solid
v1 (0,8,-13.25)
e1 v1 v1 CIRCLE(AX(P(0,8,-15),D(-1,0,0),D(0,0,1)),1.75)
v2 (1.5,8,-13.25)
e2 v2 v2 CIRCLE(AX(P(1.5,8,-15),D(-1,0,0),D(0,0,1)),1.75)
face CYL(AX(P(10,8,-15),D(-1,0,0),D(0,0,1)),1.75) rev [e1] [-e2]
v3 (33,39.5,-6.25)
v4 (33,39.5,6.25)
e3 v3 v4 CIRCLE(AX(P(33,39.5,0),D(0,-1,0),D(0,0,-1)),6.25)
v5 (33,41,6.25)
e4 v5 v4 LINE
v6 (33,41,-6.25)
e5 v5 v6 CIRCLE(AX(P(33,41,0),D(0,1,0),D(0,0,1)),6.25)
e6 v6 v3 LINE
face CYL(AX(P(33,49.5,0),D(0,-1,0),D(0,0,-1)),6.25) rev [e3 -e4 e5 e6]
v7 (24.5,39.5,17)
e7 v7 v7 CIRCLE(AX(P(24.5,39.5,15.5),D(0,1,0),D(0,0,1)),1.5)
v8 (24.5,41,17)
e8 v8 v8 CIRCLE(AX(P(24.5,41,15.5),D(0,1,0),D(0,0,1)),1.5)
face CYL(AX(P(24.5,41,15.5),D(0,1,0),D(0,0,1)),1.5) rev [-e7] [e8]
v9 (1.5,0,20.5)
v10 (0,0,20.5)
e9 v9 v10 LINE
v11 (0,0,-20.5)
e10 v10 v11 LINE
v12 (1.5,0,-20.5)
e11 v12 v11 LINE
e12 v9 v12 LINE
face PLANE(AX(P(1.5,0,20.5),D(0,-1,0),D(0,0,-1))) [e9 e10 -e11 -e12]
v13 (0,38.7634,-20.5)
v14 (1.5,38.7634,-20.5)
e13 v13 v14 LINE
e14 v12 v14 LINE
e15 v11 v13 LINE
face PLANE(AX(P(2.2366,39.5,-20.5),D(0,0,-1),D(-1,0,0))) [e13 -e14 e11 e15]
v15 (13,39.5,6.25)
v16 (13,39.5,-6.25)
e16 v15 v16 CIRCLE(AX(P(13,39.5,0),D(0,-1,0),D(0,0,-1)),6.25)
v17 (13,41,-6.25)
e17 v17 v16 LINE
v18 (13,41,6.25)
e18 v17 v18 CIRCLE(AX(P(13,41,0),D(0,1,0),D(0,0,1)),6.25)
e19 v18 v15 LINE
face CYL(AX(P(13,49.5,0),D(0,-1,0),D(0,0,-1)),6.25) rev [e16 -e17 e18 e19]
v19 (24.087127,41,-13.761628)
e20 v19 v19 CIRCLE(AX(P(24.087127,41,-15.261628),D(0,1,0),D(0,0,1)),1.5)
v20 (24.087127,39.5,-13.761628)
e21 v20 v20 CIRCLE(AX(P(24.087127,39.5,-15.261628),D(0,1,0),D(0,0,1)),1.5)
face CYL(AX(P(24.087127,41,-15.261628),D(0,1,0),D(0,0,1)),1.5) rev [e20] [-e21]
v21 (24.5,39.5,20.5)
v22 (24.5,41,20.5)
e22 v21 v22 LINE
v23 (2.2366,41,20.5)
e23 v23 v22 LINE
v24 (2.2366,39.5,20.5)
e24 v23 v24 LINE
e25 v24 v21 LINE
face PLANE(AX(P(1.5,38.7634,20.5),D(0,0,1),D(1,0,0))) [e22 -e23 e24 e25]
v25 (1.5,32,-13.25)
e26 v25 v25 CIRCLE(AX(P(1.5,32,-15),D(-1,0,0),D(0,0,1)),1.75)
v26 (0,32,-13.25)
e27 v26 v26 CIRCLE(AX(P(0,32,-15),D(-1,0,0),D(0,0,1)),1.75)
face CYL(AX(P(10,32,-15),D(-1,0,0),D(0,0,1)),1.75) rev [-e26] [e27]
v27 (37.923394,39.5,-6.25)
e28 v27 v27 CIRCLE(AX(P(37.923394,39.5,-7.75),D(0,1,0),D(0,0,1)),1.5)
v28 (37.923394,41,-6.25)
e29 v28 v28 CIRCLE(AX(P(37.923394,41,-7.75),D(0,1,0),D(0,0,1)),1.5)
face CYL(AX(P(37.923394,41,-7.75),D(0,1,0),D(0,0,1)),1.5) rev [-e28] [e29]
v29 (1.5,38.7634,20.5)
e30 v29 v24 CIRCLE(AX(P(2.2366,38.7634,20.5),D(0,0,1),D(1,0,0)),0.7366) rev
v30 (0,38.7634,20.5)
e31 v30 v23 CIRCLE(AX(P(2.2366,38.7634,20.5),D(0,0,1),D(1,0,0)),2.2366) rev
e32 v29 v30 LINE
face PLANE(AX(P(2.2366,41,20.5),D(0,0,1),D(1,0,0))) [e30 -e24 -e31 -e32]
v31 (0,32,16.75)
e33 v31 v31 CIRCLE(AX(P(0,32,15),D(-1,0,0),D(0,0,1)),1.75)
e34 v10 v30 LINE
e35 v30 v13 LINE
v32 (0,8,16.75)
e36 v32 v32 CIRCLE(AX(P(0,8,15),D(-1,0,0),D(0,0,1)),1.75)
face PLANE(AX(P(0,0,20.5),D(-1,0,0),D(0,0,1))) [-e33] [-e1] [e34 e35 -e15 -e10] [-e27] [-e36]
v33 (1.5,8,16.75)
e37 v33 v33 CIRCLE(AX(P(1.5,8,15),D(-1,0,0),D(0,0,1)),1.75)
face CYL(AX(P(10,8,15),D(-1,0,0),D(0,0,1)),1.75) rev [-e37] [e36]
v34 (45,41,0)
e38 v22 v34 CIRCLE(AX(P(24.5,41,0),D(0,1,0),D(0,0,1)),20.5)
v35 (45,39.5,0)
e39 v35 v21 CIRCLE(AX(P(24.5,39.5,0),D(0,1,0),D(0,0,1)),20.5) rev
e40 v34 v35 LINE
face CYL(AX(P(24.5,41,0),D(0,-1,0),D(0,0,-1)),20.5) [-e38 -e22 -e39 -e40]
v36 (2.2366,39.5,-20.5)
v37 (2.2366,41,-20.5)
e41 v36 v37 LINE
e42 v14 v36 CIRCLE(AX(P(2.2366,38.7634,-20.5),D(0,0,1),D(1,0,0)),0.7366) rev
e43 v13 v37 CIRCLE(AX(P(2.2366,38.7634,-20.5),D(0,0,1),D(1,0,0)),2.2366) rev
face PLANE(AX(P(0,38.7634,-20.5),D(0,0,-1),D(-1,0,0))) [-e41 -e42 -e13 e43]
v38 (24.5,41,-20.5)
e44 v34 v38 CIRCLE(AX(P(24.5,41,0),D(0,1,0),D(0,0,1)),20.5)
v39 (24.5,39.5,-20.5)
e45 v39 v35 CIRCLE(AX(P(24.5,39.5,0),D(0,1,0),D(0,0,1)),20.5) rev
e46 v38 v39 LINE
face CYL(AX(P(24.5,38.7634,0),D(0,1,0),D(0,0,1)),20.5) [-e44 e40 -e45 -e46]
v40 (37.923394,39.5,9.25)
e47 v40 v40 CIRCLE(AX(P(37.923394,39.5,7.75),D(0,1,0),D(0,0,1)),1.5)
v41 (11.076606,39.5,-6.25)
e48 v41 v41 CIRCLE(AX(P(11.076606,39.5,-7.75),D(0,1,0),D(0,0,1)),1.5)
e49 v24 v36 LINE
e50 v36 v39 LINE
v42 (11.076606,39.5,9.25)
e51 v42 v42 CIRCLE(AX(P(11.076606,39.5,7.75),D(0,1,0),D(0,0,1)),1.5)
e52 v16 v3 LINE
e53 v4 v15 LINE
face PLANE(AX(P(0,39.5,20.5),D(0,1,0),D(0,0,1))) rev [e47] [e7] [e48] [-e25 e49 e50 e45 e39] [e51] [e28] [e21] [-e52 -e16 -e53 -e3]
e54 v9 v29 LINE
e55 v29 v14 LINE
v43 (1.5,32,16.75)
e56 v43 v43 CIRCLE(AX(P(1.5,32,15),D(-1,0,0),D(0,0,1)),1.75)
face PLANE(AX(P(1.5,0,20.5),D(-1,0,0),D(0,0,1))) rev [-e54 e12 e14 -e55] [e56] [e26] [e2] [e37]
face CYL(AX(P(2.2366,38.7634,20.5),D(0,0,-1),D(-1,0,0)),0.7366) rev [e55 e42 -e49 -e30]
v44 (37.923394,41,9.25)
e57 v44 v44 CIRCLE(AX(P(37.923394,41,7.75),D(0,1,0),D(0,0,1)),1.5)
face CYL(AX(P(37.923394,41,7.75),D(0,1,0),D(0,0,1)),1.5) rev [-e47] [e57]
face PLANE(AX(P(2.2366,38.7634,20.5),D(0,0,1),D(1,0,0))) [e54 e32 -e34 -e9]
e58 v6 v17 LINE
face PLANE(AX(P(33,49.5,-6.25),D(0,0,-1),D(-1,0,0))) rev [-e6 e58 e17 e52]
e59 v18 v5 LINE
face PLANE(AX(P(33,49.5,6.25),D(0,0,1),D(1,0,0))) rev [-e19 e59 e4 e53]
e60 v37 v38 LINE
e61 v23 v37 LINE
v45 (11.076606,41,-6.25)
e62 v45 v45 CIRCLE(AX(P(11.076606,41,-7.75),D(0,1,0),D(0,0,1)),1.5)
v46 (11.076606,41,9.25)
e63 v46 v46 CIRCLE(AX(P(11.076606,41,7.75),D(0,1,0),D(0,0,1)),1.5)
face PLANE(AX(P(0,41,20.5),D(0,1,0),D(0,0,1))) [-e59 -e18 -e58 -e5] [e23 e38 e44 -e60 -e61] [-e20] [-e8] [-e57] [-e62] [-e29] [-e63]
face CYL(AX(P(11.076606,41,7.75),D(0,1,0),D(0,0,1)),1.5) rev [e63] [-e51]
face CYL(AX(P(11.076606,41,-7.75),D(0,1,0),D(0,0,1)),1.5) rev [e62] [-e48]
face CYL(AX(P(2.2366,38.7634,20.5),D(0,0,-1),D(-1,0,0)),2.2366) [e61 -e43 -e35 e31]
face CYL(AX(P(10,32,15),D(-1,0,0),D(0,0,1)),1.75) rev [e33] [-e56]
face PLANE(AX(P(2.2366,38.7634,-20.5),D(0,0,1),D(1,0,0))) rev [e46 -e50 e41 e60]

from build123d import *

# Parameters (mm, degrees)
SM_BASE_FLANGE_1_DEPTH = 20.5
FILLET_1_R             = 20.5
MM_1_D                 = 3
MM_1_DEPTH             = 7.5
MM_1_TIP               = 0.901290929
SKETCH_10_R            = 1.75
CUT_EXTRUDE_1_DEPTH    = 10
CUT_EXTRUDE_2_DEPTH    = 10


# Sheet-metal steps are written as plain solids
with BuildPart() as part:
    # Sketch 1 → 基体-法兰1 (new, symmetric)
    with BuildSketch(Plane.XY):
        with BuildLine():
            Line((0, 0), (0, 38.7634))
            ThreePointArc((0, 38.7634), (0.655084973, 40.344915027), (2.2366, 41))
            Line((2.2366, 41), (45, 41))
            Line((45, 41), (45, 39.5))
            Line((45, 39.5), (2.2366, 39.5))
            ThreePointArc((2.2366, 39.5), (1.715745145, 39.284254855), (1.5, 38.7634))
            Line((1.5, 38.7634), (1.5, 0))
            Line((1.5, 0), (0, 0))
        make_face()
    extrude(amount=SM_BASE_FLANGE_1_DEPTH, both=True)

    # 圆角1
    fillet_1_edges = [part.edges().sort_by_distance(p)[0] for p in [
        (45, 40.25, -20.5),
        (45, 40.25, 20.5),
    ]]
    fillet(fillet_1_edges, radius=FILLET_1_R - 0.0001)  # a hair under: the kernel refuses the full size

    # 大小mm 暗销孔1
    with Locations(Plane(origin=(0, 41, 0), x_dir=(1, 0, 0), z_dir=(0, 1, 0))):
        with Locations((24.087127043, 15.261627687), (37.923393759, 7.75), (37.923393759, -7.75), (24.5, -15.5), (11.076606241, -7.75), (11.076606241, 7.75)):
            Hole(MM_1_D / 2, depth=MM_1_DEPTH)
            with Locations((0, 0, -(MM_1_DEPTH + MM_1_TIP / 2))):  # 118° drill point
                Cone(0, MM_1_D / 2, MM_1_TIP, mode=Mode.SUBTRACT)

    # 草图10 → 切除-拉伸1 (cut)
    with BuildSketch(Plane.ZY):
        with Locations((-15, 32)):
            Circle(SKETCH_10_R)
        with Locations((15, 32)):
            Circle(SKETCH_10_R)
        with Locations((15, 8)):
            Circle(SKETCH_10_R)
        with Locations((-15, 8)):
            Circle(SKETCH_10_R)
    extrude(amount=-CUT_EXTRUDE_1_DEPTH, mode=Mode.SUBTRACT)

    # 草图11 → 切除-拉伸2 (cut)
    with BuildSketch(Plane.XZ.offset(-39.5)):
        with BuildLine():
            Line((33, -6.25), (13, -6.25))
            ThreePointArc((13, -6.25), (6.75, 0), (13, 6.25))
            Line((13, 6.25), (33, 6.25))
            ThreePointArc((33, 6.25), (39.25, 0), (33, -6.25))
        make_face()
    extrude(amount=-CUT_EXTRUDE_2_DEPTH, mode=Mode.SUBTRACT)


solid = part.part
